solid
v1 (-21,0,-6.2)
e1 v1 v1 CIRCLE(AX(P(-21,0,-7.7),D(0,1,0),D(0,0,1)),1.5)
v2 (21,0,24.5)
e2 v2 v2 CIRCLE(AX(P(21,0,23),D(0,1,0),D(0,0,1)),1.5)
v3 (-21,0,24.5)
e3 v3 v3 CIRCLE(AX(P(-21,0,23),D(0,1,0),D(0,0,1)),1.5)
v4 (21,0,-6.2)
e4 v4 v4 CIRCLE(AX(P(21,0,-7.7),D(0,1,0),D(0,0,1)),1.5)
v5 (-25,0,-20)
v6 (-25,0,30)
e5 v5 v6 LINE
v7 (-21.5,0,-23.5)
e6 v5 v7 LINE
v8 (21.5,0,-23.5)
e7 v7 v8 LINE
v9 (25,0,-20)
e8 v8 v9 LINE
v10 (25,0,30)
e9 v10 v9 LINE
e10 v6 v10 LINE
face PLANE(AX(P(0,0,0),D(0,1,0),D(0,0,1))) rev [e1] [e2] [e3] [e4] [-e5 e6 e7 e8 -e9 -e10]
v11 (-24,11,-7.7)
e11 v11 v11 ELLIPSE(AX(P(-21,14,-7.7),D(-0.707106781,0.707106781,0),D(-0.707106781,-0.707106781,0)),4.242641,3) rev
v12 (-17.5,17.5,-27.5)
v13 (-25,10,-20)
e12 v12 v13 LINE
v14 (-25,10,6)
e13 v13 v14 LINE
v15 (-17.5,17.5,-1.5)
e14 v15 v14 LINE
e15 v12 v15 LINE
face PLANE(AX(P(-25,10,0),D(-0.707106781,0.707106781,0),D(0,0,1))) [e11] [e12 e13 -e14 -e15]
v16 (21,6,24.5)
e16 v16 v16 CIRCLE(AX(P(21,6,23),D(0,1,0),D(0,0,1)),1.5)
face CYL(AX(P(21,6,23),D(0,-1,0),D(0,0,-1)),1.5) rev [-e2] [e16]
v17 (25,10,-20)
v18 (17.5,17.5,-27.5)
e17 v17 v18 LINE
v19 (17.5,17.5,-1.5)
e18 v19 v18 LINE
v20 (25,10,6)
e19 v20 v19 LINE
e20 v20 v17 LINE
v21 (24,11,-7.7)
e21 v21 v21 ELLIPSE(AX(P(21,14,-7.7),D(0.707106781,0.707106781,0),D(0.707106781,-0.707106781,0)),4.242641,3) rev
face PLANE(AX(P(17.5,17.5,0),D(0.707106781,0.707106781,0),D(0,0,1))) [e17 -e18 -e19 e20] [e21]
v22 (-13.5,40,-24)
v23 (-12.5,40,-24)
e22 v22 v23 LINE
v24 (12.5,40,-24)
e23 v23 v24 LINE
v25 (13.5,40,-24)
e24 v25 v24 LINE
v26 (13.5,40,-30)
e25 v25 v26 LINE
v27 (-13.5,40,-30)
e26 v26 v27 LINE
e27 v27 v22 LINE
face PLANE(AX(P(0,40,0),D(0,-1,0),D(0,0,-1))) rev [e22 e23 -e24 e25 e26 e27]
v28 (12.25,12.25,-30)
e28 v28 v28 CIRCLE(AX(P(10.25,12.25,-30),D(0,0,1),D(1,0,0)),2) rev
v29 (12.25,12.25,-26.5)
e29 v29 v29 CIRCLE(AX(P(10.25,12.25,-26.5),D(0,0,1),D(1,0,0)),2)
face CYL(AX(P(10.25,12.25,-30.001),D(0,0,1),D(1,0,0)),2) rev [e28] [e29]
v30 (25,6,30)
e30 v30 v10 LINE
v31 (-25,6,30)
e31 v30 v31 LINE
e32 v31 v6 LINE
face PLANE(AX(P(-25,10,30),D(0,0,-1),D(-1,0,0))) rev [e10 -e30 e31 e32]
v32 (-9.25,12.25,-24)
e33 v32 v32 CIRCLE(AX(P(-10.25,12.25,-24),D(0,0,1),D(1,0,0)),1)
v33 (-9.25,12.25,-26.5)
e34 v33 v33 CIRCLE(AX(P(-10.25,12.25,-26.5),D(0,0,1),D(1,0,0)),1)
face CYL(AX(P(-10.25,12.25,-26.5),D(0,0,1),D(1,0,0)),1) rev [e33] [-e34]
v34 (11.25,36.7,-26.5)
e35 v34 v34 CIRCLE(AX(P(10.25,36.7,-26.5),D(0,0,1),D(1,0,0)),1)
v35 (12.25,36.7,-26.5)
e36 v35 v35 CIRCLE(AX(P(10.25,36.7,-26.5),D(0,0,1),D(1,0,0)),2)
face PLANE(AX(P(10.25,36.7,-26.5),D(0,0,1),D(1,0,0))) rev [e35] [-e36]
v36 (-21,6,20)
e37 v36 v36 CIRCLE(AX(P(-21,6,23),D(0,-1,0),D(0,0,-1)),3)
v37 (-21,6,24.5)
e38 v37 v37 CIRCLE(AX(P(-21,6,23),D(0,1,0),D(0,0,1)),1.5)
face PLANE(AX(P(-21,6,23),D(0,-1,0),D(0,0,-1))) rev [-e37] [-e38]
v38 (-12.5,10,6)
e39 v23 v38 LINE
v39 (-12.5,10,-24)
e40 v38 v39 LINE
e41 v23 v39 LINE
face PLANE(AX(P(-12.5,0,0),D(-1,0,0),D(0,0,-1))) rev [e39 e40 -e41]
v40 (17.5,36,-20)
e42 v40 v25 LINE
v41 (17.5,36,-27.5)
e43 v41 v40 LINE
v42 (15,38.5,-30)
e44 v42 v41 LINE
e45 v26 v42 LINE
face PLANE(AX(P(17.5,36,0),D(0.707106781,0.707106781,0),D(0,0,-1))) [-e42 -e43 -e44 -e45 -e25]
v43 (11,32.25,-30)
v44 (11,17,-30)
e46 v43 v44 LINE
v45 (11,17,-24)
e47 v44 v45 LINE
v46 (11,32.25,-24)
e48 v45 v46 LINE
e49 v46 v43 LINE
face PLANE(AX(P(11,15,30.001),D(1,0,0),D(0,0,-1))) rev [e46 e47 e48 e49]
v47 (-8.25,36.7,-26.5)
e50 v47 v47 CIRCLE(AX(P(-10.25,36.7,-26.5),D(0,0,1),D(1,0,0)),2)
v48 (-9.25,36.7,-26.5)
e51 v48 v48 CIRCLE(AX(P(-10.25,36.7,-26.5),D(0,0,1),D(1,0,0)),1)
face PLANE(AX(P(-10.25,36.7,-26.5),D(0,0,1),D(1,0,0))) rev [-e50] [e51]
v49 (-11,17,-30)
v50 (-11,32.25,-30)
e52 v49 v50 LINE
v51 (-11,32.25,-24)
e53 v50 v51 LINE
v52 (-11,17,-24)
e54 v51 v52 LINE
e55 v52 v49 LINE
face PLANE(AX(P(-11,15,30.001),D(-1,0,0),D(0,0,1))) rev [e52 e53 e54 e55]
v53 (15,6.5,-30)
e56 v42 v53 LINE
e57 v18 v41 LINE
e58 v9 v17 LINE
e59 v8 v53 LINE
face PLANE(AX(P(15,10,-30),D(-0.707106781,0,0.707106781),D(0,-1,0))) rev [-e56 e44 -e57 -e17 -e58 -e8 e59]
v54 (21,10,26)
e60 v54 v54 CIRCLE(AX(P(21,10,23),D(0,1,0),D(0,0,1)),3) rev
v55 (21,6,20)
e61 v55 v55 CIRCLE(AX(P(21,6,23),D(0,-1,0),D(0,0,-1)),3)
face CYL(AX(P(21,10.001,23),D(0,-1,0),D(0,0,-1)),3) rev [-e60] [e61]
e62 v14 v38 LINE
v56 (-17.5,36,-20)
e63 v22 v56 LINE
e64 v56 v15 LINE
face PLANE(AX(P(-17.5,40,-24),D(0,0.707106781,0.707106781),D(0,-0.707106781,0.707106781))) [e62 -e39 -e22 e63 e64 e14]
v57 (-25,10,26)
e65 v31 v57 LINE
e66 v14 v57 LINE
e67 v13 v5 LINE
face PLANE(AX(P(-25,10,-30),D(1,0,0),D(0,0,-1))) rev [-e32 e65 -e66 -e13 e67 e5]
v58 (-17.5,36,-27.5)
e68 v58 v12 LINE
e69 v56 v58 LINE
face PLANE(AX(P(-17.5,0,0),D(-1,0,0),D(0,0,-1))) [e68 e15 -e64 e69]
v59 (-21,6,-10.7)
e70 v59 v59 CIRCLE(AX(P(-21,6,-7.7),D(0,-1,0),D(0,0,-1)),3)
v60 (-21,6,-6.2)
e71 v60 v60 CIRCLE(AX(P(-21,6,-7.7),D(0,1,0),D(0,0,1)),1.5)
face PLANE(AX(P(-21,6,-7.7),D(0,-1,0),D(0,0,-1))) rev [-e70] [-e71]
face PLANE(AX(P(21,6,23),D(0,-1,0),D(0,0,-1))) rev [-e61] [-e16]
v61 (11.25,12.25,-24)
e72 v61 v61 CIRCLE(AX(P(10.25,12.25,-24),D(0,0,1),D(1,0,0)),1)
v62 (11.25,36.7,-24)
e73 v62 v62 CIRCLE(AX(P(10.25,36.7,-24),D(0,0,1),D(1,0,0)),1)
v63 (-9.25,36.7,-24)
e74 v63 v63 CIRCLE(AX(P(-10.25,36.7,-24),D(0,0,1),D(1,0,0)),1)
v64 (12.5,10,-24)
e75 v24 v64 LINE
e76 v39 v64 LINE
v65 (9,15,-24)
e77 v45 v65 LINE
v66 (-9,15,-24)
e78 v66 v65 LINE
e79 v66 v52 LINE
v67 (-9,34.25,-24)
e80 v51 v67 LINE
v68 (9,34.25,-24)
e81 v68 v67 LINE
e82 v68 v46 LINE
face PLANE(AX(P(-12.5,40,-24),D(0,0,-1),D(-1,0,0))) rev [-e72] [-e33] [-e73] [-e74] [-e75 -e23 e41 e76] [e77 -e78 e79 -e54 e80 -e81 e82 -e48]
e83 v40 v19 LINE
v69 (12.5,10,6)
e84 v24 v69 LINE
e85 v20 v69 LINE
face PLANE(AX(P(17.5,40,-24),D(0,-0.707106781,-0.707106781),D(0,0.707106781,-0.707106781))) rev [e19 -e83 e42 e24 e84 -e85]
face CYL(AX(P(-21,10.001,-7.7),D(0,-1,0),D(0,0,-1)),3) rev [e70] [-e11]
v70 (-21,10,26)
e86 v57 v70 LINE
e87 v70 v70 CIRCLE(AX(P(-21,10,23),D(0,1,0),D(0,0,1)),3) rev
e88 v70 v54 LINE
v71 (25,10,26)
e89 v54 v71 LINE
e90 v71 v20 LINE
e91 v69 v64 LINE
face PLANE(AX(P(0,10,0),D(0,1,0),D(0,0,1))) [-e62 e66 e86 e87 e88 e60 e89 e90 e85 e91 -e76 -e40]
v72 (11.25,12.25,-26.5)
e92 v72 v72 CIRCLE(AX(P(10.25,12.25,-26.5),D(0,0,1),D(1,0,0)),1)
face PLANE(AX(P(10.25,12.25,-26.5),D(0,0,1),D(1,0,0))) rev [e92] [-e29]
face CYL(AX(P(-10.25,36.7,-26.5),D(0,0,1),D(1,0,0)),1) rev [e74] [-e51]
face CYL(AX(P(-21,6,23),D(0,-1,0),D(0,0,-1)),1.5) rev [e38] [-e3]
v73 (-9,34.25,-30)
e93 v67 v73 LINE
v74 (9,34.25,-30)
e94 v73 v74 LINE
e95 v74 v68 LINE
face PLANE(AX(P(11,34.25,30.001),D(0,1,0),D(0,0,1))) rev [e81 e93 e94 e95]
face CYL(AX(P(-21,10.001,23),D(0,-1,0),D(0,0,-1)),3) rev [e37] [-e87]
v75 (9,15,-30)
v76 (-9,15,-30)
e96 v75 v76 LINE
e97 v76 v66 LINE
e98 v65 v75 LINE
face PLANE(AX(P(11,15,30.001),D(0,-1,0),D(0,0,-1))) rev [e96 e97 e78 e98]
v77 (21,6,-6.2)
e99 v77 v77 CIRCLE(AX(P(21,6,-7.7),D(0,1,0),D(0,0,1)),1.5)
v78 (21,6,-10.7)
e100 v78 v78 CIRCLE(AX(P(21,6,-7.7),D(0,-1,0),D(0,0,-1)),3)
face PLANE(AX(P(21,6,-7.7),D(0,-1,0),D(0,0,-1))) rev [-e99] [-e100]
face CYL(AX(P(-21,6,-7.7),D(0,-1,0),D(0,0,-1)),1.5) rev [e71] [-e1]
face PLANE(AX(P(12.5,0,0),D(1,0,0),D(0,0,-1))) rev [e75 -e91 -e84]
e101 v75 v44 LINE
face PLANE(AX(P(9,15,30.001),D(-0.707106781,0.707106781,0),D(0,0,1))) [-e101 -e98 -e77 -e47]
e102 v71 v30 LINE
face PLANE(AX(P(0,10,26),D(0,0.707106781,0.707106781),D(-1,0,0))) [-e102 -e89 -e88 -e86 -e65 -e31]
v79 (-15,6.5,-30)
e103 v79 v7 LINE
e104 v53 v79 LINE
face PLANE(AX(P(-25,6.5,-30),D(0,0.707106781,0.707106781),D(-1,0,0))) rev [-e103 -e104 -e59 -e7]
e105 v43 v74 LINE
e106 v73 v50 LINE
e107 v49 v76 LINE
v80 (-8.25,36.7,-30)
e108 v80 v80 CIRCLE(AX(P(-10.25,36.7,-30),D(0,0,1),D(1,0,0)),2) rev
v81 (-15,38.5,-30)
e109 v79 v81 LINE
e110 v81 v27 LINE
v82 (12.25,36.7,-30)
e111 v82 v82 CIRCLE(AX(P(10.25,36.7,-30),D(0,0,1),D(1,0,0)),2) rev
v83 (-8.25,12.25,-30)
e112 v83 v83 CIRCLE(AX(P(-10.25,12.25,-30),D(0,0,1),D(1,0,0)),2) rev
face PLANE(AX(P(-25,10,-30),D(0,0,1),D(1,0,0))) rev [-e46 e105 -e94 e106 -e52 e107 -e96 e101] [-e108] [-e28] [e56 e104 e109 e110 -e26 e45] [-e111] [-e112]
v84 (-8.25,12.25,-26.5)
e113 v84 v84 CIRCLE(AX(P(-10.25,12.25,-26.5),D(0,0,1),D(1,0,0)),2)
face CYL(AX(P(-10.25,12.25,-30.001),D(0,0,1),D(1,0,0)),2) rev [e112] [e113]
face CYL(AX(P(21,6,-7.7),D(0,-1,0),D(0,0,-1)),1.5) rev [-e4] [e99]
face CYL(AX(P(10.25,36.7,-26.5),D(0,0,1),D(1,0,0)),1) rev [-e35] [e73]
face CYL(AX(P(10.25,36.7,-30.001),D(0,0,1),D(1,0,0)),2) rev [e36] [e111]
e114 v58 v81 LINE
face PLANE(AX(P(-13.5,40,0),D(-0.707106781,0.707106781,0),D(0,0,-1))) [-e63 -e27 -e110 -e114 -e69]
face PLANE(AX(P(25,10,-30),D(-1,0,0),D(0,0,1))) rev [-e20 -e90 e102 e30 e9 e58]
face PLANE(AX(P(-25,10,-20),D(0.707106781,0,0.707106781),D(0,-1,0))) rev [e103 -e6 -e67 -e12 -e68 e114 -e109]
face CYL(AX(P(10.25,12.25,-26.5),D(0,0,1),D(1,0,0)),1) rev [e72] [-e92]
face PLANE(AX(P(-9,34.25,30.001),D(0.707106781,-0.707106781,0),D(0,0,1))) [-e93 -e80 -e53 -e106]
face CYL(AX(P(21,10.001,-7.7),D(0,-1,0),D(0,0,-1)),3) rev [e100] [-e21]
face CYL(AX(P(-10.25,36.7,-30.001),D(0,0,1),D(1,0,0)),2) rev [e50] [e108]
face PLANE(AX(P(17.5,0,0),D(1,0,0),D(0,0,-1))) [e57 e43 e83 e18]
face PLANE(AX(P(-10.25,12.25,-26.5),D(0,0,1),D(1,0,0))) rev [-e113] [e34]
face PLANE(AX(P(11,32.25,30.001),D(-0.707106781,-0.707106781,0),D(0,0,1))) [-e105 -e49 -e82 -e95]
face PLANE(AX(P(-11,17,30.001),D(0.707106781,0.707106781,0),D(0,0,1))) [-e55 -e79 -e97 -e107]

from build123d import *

# Parameters (mm, degrees)
SKETCH1_W           = 50
SKETCH1_H           = 60
BOSS_EXTRUDE1_DEPTH = 10
SKETCH2_R           = 1.5
CUT_EXTRUDE1_DEPTH  = 6
CUT_EXTRUDE2_REACH  = 41.509
SKETCH3_R           = 3
SKETCH5_W           = 25
SKETCH5_H           = 6
BOSS_EXTRUDE3_DEPTH = 30
CUT_EXTRUDE3_REACH  = 78.322
SKETCH6_W           = 22
SKETCH6_H           = 19.25
SKETCH7_R           = 1
CUT_EXTRUDE4_DEPTH  = 2.5
CUT_EXTRUDE5_REACH  = 75.602
SKETCH8_R           = 2
BOSS_EXTRUDE4_DEPTH = 5
CHAMFER1_SIZE       = 7.5
CHAMFER2_SIZE       = 10
CHAMFER4_SIZE       = 6.5
CHAMFER5_SIZE       = 4
CHAMFER6_SIZE       = 4
CHAMFER7_SIZE       = 2


# Some blends are built 0.0001 mm under size
with BuildPart() as part:
    # Sketch1 → Boss-Extrude1 (new body)
    with BuildSketch(Plane(origin=(0, 0, 0), x_dir=(1, 0, 0), z_dir=(0, 1, 0))):
        Rectangle(SKETCH1_W, SKETCH1_H)
    extrude(amount=BOSS_EXTRUDE1_DEPTH)

    # Sketch2 → Cut-Extrude1 (cut)
    with BuildSketch(Plane(origin=(0, 0, 0), x_dir=(1, 0, 0), z_dir=(0, 1, 0))):
        with Locations(Location((-21, 7.7, 0), (0, 0, 270))):
            Circle(SKETCH2_R)
        with Locations(Location((-21, -23, 0), (0, 0, 270))):
            Circle(SKETCH2_R)
        with Locations(Location((21, 7.7, 0), (0, 0, 270))):
            Circle(SKETCH2_R)
        with Locations(Location((21, -23, 0), (0, 0, 270))):
            Circle(SKETCH2_R)
    extrude(amount=CUT_EXTRUDE1_DEPTH, mode=Mode.SUBTRACT)

    # Sketch3 → Cut-Extrude2 (cut, up to next)
    with BuildSketch(Plane.XZ.offset(-6), mode=Mode.PRIVATE) as cut_extrude2_sk1:
        with Locations(Location((-21, 23, 0), (0, 0, 270))):
            Circle(SKETCH3_R)
    cut_extrude2_tool1 = extrude(cut_extrude2_sk1.sketch, amount=-CUT_EXTRUDE2_REACH, mode=Mode.PRIVATE) & part.part
    # Sketch3 → Cut-Extrude2 (cut, up to next)
    with BuildSketch(Plane.XZ.offset(-6), mode=Mode.PRIVATE) as cut_extrude2_sk2:
        with Locations(Location((21, 23, 0), (0, 0, 270))):
            Circle(SKETCH3_R)
    cut_extrude2_tool2 = extrude(cut_extrude2_sk2.sketch, amount=-CUT_EXTRUDE2_REACH, mode=Mode.PRIVATE) & part.part
    # Sketch3 → Cut-Extrude2 (cut, up to next)
    with BuildSketch(Plane.XZ.offset(-6), mode=Mode.PRIVATE) as cut_extrude2_sk3:
        with Locations(Location((21, -7.7, 0), (0, 0, 270))):
            Circle(SKETCH3_R)
    cut_extrude2_tool3 = extrude(cut_extrude2_sk3.sketch, amount=-CUT_EXTRUDE2_REACH, mode=Mode.PRIVATE) & part.part
    # Sketch3 → Cut-Extrude2 (cut, up to next)
    with BuildSketch(Plane.XZ.offset(-6), mode=Mode.PRIVATE) as cut_extrude2_sk4:
        with Locations(Location((-21, -7.7, 0), (0, 0, 270))):
            Circle(SKETCH3_R)
    cut_extrude2_tool4 = extrude(cut_extrude2_sk4.sketch, amount=-CUT_EXTRUDE2_REACH, mode=Mode.PRIVATE) & part.part
    add(cut_extrude2_tool1.solids().sort_by_distance((-21, 6, 23))[0], mode=Mode.SUBTRACT)
    add(cut_extrude2_tool2.solids().sort_by_distance((21, 6, 23))[0], mode=Mode.SUBTRACT)
    add(cut_extrude2_tool3.solids().sort_by_distance((21, 6, -7.7))[0], mode=Mode.SUBTRACT)
    add(cut_extrude2_tool4.solids().sort_by_distance((-21, 6, -7.7))[0], mode=Mode.SUBTRACT)

    # Sketch5 → Boss-Extrude3 (add)
    with BuildSketch(Plane(origin=(0, 10, 0), x_dir=(1, 0, 0), z_dir=(0, 1, 0))):
        with Locations((0, 27)):
            Rectangle(SKETCH5_W, SKETCH5_H)
    extrude(amount=BOSS_EXTRUDE3_DEPTH)

    # Sketch6 → Cut-Extrude3 (cut, up to next)
    with BuildSketch(Plane(origin=(0, 0, -30), x_dir=(-1, 0, 0), z_dir=(0, 0, -1)), mode=Mode.PRIVATE) as cut_extrude3_sk1:
        with Locations((0, 24.625)):
            Rectangle(SKETCH6_W, SKETCH6_H)
    cut_extrude3_tool1 = extrude(cut_extrude3_sk1.sketch, amount=-CUT_EXTRUDE3_REACH, mode=Mode.PRIVATE) & part.part
    add(cut_extrude3_tool1.solids().sort_by_distance((0, 24.625, -30))[0], mode=Mode.SUBTRACT)

    # Sketch7 → Cut-Extrude4 (cut)
    with BuildSketch(Plane.XY.offset(-24)):
        with Locations((10.25, 12.25)):
            Circle(SKETCH7_R)
        with Locations((-10.25, 12.25)):
            Circle(SKETCH7_R)
        with Locations((-10.25, 36.7)):
            Circle(SKETCH7_R)
        with Locations((10.25, 36.7)):
            Circle(SKETCH7_R)
    extrude(amount=-CUT_EXTRUDE4_DEPTH, mode=Mode.SUBTRACT)

    # Sketch8 → Cut-Extrude5 (cut, up to next)
    with BuildSketch(Plane.XY.offset(-26.5), mode=Mode.PRIVATE) as cut_extrude5_sk1:
        with Locations((-10.25, 36.7)):
            Circle(SKETCH8_R)
    cut_extrude5_tool1 = extrude(cut_extrude5_sk1.sketch, amount=-CUT_EXTRUDE5_REACH, mode=Mode.PRIVATE) & part.part
    # Sketch8 → Cut-Extrude5 (cut, up to next)
    with BuildSketch(Plane.XY.offset(-26.5), mode=Mode.PRIVATE) as cut_extrude5_sk2:
        with Locations((10.25, 36.7)):
            Circle(SKETCH8_R)
    cut_extrude5_tool2 = extrude(cut_extrude5_sk2.sketch, amount=-CUT_EXTRUDE5_REACH, mode=Mode.PRIVATE) & part.part
    # Sketch8 → Cut-Extrude5 (cut, up to next)
    with BuildSketch(Plane.XY.offset(-26.5), mode=Mode.PRIVATE) as cut_extrude5_sk3:
        with Locations((10.25, 12.25)):
            Circle(SKETCH8_R)
    cut_extrude5_tool3 = extrude(cut_extrude5_sk3.sketch, amount=-CUT_EXTRUDE5_REACH, mode=Mode.PRIVATE) & part.part
    # Sketch8 → Cut-Extrude5 (cut, up to next)
    with BuildSketch(Plane.XY.offset(-26.5), mode=Mode.PRIVATE) as cut_extrude5_sk4:
        with Locations((-10.25, 12.25)):
            Circle(SKETCH8_R)
    cut_extrude5_tool4 = extrude(cut_extrude5_sk4.sketch, amount=-CUT_EXTRUDE5_REACH, mode=Mode.PRIVATE) & part.part
    add(cut_extrude5_tool1.solids().sort_by_distance((-10.25, 36.7, -26.5))[0], mode=Mode.SUBTRACT)
    add(cut_extrude5_tool2.solids().sort_by_distance((10.25, 36.7, -26.5))[0], mode=Mode.SUBTRACT)
    add(cut_extrude5_tool3.solids().sort_by_distance((10.25, 12.25, -26.5))[0], mode=Mode.SUBTRACT)
    add(cut_extrude5_tool4.solids().sort_by_distance((-10.25, 12.25, -26.5))[0], mode=Mode.SUBTRACT)

    # Sketch9 → Boss-Extrude4 (add)
    with BuildSketch(Plane(origin=(12.5, 0, 0), x_dir=(0, 0, -1), z_dir=(1, 0, 0))):
        Polygon((30, 40), (24, 40), (-6, 10), (30, 10), align=None)
    boss_extrude4 = extrude(amount=BOSS_EXTRUDE4_DEPTH)

    # Mirror1: Boss-Extrude4 across plane
    add(boss_extrude4.mirror(Plane(origin=(0, 0, 0), x_dir=(0, 0, 1), z_dir=(1, 0, 0))))

    # Chamfer1
    # the kernel refuses this chamfer: 7.5 mm, written as the material it adds along each edge
    with BuildSketch(Plane(origin=(17.5, 10, 25.28762241), x_dir=(-0.02749587661058632, 0.9996219169112968, 0), z_dir=(0, 0, -1))) as chamfer1_piece_1_section:
        Polygon((CHAMFER1_SIZE * 0.999621916911, CHAMFER1_SIZE * 0.0274958766106), (-CHAMFER1_SIZE * 0.0274958766106, CHAMFER1_SIZE * 0.999621916911), (0, 0), align=None)
    chamfer1_piece_1 = extrude(amount=55.28762241, mode=Mode.PRIVATE)
    chamfer1_piece_1 = split(chamfer1_piece_1, bisect_by=Plane(origin=(19.963540821, 21.141387269, -5.141387269), z_dir=(0, -0.7071067811865512, -0.7071067811865438)), keep=Keep.TOP, mode=Mode.PRIVATE)
    chamfer1_piece_1 = chamfer1_piece_1 - Plane(origin=(21, 12.394681138, -7.7), x_dir=(0, 0, -1), z_dir=(0, -1, 0)) * Cylinder(3, 141, mode=Mode.PRIVATE)
    chamfer1_piece_1 = split(chamfer1_piece_1, bisect_by=Plane(origin=(25, 12.394681138, -13.888093401), z_dir=(-1, 0, 0)), keep=Keep.TOP, mode=Mode.PRIVATE)
    add(chamfer1_piece_1)
    with BuildSketch(Plane(origin=(-17.5, 10, 25.28762241), x_dir=(0.02749587661058632, 0.9996219169112968, 0), z_dir=(0, 0, -1))) as chamfer1_piece_2_section:
        Polygon((CHAMFER1_SIZE * 0.999621916911, -CHAMFER1_SIZE * 0.0274958766106), (-CHAMFER1_SIZE * 0.0274958766106, -CHAMFER1_SIZE * 0.999621916911), (0, 0), align=None)
    chamfer1_piece_2 = extrude(amount=55.28762241, mode=Mode.PRIVATE)
    chamfer1_piece_2 = split(chamfer1_piece_2, bisect_by=Plane(origin=(-19.963548268, 21.141369022, -5.141369022), z_dir=(0, -0.7071067811865512, -0.7071067811865438)), keep=Keep.TOP, mode=Mode.PRIVATE)
    chamfer1_piece_2 = chamfer1_piece_2 - Plane(origin=(-21, 12.394672857, -7.7), x_dir=(0, 0, -1), z_dir=(0, -1, 0)) * Cylinder(3, 141, mode=Mode.PRIVATE)
    chamfer1_piece_2 = split(chamfer1_piece_2, bisect_by=Plane(origin=(-25, 12.394672857, -13.888065186), z_dir=(1, 0, 0)), keep=Keep.TOP, mode=Mode.PRIVATE)
    add(chamfer1_piece_2)

    # Chamfer2
    chamfer2_edges = [part.edges().sort_by_distance(p)[0] for p in [
        (-25, 5, -30),
        (25, 5, -30),
    ]]
    chamfer(chamfer2_edges, length=CHAMFER2_SIZE)

    # Chamfer4
    chamfer4_edges = [part.edges().sort_by_distance(p)[0] for p in [
        (0, 0, -30),
    ]]
    chamfer(chamfer4_edges, length=CHAMFER4_SIZE)

    # Chamfer5
    chamfer5_edges = [part.edges().sort_by_distance(p)[0] for p in [
        (17.5, 40, -25.75),
        (-17.5, 40, -25.75),
    ]]
    chamfer(chamfer5_edges, length=CHAMFER5_SIZE)

    # Chamfer6
    chamfer6_edges = [part.edges().sort_by_distance(p)[0] for p in [
        (0, 10, 30),
    ]]
    chamfer(chamfer6_edges, length=CHAMFER6_SIZE - 0.0001)  # a hair under: the kernel refuses the full size

    # Chamfer7
    chamfer7_edges = [part.edges().sort_by_distance(p)[0] for p in [
        (-11, 34.25, -27),
        (-11, 15, -27),
        (11, 15, -27),
        (11, 34.25, -27),
    ]]
    chamfer(chamfer7_edges, length=CHAMFER7_SIZE)


solid = part.part
